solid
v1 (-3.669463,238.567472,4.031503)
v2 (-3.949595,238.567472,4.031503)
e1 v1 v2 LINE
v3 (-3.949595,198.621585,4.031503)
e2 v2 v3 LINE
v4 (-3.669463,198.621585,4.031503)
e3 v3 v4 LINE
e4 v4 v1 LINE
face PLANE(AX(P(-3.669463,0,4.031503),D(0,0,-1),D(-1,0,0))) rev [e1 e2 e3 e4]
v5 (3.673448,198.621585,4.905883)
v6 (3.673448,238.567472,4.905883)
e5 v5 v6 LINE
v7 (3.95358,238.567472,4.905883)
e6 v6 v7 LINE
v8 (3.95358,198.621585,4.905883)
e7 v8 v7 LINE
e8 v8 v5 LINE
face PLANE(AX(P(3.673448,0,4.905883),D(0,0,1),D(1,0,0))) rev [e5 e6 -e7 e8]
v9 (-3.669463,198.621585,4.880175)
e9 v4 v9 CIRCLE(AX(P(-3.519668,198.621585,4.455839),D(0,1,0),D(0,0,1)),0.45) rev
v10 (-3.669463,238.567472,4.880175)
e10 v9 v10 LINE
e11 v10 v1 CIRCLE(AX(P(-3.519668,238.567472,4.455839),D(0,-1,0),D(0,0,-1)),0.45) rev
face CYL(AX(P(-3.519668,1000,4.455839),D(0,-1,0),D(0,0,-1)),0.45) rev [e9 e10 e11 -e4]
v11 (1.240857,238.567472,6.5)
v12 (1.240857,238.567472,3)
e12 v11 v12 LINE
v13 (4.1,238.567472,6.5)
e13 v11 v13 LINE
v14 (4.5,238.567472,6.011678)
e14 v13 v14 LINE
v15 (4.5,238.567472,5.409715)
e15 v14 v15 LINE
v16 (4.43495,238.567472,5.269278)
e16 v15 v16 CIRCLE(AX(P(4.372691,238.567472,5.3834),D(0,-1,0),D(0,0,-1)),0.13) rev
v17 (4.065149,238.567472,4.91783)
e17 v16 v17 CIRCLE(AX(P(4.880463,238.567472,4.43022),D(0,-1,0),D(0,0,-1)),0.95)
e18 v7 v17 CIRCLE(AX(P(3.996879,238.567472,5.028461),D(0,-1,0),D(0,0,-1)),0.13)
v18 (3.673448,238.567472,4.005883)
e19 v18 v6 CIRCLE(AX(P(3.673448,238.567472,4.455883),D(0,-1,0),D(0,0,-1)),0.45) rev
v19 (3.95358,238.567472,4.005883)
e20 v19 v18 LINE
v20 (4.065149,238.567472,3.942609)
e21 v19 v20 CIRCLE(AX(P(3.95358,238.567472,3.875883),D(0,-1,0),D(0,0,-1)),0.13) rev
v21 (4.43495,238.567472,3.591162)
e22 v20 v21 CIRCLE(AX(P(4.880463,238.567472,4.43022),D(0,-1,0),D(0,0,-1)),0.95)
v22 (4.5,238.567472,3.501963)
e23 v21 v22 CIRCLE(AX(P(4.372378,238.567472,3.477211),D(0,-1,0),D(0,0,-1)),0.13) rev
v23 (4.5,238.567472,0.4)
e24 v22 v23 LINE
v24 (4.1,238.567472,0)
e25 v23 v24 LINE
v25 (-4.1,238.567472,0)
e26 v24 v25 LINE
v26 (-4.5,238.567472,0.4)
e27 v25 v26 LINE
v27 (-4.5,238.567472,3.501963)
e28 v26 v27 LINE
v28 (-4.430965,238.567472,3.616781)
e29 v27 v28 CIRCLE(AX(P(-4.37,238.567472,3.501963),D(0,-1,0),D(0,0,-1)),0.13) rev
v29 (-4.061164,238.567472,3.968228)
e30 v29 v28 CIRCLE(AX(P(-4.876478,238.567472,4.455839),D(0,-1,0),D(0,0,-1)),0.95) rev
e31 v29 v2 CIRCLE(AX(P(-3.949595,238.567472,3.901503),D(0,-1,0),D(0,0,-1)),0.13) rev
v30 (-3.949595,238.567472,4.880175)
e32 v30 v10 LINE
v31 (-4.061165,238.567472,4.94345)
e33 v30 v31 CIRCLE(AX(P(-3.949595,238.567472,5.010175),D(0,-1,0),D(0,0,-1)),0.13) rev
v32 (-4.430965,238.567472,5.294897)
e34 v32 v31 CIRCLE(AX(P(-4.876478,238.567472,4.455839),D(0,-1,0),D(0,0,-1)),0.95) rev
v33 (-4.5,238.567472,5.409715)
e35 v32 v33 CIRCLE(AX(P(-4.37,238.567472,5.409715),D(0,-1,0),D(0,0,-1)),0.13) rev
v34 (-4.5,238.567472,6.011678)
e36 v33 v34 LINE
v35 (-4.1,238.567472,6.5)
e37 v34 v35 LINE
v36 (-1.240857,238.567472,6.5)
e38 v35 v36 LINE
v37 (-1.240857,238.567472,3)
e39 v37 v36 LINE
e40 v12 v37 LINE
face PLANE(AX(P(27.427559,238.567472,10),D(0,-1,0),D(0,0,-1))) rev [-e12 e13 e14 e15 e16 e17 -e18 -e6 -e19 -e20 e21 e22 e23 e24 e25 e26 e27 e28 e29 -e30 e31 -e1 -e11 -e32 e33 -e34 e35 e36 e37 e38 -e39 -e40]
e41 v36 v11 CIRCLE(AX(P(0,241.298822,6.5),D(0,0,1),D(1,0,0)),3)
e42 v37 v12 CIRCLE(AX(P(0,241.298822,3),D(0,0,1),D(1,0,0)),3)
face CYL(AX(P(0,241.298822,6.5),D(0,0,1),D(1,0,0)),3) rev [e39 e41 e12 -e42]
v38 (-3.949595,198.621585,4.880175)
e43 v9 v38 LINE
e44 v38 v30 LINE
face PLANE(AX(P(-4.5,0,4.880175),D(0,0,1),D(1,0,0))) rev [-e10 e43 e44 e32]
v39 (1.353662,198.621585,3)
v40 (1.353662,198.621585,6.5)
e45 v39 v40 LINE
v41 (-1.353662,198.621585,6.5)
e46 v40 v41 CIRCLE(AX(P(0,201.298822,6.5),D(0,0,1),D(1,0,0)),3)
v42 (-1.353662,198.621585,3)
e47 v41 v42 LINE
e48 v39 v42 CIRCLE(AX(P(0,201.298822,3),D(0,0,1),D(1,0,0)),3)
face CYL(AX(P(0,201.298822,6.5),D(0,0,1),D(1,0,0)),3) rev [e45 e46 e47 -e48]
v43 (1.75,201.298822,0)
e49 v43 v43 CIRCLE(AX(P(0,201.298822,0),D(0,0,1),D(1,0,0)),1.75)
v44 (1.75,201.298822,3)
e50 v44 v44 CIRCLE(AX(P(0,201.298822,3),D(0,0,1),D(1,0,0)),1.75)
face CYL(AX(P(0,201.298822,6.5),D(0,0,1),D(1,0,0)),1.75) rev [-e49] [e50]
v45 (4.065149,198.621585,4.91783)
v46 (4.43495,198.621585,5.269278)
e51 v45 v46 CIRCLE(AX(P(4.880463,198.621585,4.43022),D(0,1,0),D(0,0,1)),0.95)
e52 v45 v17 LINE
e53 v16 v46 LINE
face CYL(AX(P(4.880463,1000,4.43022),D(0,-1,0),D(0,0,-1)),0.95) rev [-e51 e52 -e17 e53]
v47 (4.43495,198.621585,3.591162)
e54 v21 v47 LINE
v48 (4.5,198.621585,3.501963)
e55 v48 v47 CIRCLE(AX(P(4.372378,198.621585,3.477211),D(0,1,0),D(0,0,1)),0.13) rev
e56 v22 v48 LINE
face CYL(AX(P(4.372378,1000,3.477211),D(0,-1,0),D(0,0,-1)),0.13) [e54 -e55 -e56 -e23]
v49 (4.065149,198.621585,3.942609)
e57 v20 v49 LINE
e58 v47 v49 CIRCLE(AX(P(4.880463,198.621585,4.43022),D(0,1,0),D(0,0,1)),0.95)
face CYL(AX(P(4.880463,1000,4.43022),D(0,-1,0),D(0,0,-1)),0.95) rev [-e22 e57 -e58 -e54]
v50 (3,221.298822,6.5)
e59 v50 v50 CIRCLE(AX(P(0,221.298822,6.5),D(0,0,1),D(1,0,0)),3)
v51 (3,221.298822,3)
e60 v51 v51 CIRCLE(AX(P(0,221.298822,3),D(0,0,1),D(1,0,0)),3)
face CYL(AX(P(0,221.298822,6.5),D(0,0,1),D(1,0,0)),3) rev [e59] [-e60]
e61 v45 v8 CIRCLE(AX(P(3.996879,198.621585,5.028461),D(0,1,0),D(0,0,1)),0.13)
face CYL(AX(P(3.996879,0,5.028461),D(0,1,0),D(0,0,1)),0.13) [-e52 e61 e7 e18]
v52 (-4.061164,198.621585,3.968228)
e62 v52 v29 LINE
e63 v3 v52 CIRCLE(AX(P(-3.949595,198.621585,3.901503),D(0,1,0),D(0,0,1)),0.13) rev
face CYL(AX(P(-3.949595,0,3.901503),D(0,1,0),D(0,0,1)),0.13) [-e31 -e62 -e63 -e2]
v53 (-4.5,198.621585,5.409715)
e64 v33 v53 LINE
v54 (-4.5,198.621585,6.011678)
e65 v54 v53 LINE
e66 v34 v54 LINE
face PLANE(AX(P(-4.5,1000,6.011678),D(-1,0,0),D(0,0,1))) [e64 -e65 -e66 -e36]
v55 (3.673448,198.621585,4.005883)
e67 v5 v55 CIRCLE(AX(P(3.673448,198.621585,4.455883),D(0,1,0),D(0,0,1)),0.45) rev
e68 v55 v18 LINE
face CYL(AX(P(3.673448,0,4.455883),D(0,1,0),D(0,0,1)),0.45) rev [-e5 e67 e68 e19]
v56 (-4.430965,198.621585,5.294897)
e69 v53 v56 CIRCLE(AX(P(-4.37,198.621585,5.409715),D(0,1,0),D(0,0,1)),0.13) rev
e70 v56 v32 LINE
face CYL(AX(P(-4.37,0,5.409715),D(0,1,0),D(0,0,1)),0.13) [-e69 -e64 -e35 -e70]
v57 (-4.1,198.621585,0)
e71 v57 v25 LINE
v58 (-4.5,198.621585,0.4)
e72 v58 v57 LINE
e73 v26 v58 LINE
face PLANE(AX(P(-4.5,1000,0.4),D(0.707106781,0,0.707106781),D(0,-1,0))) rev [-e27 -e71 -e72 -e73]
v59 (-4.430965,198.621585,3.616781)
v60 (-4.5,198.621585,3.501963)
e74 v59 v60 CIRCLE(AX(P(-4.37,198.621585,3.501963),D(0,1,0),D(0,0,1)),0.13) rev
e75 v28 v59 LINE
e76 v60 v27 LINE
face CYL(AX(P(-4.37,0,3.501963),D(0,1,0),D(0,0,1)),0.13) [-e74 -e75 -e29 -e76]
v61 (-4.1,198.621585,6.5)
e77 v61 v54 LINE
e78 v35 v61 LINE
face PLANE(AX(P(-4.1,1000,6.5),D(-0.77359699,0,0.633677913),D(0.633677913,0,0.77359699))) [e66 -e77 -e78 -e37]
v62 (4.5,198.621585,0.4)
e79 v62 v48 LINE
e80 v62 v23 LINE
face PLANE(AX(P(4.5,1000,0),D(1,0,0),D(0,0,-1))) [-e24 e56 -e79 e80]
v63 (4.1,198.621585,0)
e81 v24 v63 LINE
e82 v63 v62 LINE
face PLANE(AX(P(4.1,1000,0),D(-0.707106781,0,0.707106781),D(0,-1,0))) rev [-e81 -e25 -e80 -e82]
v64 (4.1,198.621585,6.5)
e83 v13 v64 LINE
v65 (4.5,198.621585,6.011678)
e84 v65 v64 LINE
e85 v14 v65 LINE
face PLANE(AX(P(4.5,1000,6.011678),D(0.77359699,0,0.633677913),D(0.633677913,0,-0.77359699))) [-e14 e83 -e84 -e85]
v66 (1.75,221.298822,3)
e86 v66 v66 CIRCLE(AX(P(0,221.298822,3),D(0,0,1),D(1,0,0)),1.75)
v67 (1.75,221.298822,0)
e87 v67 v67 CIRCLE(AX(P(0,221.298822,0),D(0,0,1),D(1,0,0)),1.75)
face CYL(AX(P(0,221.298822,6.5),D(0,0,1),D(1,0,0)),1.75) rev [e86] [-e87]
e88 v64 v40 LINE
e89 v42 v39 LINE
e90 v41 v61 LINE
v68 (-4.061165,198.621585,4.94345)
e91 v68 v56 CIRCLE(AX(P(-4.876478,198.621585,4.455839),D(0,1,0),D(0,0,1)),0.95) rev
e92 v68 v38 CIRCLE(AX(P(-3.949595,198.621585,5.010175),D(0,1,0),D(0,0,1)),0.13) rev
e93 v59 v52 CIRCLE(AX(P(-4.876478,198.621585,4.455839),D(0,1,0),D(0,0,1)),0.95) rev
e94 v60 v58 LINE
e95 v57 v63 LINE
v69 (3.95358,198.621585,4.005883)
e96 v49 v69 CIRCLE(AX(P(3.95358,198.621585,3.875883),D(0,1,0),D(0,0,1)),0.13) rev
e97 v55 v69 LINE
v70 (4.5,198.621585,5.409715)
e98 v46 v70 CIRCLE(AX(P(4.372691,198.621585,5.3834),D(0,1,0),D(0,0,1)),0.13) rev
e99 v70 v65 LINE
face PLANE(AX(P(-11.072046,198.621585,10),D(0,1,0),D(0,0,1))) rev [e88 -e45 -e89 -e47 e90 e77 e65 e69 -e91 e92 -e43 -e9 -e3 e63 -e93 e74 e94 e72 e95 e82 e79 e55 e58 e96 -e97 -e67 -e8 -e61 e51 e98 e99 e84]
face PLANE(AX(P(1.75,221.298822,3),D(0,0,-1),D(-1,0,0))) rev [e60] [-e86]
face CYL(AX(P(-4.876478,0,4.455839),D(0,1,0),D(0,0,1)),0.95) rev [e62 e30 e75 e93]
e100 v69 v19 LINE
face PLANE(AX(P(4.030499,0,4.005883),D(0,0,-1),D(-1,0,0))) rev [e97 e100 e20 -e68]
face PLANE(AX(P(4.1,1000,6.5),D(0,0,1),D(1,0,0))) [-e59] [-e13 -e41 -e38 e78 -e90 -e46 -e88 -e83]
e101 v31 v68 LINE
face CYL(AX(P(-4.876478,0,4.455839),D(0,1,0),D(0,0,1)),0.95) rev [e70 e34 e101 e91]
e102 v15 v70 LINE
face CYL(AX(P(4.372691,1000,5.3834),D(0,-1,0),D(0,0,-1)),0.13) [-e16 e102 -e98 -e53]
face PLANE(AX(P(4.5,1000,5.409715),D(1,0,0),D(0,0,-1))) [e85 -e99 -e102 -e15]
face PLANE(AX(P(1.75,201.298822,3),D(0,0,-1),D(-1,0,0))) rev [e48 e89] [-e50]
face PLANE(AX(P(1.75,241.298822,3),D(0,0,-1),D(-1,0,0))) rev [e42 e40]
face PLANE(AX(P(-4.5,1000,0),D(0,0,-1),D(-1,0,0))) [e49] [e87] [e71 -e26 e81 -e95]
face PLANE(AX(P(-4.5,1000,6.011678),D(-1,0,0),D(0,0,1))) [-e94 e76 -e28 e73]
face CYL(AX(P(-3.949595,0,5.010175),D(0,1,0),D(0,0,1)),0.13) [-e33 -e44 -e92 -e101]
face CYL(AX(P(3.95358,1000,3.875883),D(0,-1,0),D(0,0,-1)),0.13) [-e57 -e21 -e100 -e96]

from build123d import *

# Parameters (mm, degrees)
RESSALTO_EXTRUS_O1_DEPTH                             = 1000
CORTE_EXTRUS_O1_START                                = -1000
CORTE_EXTRUS_O1_DEPTH                                = 1000
CORTE_EXTRUS_O2_DEPTH                                = 1001.031261626
CORTE_EXTRUS_O3_DEPTH                                = 1001.031261626
CORTE_EXTRUS_O4_DEPTH                                = 1001.031261626
CORTE_EXTRUS_O5_DEPTH                                = 0.002166667
CORTE_EXTRUS_O6_DEPTH                                = 0.002166667
CORTE_EXTRUS_O7_DEPTH                                = 0.002166667
CORTE_EXTRUS_O8_DEPTH                                = 0.002166667
INCLINA_O1_ANGLE                                     = 45.1469538
ESBO_O10_W                                           = 0.450000001
ESBO_O10_H                                           = 1000
REBAIXO_PARA_PARAFUSO_DE_M_QUINA_DE_CABE_D           = 3.5
REBAIXO_PARA_PARAFUSO_DE_M_QUINA_DE_CABE_CBORE_D     = 6
REBAIXO_PARA_PARAFUSO_DE_M_QUINA_DE_CABE_CBORE_DEPTH = 3.50000002
CHANFRO1_SIZE                                        = 0.062563219
CHANFRO1_SIZE2                                       = 0.062205617
CHANFRO3_START                                       = -3.730761794
CHANFRO3_DEPTH                                       = 0.399013115
CHANFRO4_SIZE                                        = 0.4
FILETE1_R                                            = 0.130000023
SKETCH1_W                                            = 36.072768502
SKETCH1_H                                            = 771.589023544
SKETCH1_W_2                                          = 21.632087489
SKETCH1_H_2                                          = 231.614654652
CUT_EXTRUDE1_DEPTH                                   = 10


with BuildPart() as part:
    # Esboço1 → Ressalto-extrusão1 (new body)
    with BuildSketch(Plane.XZ):
        with BuildLine():
            Line((4.5, 5.4097155), (4.5, 6.01167813))
            Line((4.5, 6.01167813), (4.1, 6.50000002))
            Line((4.1, 6.50000002), (-4.1, 6.50000002))
            Line((-4.1, 6.50000002), (-4.5, 6.01167813))
            Line((-4.5, 6.01167813), (-4.5, 2e-08))
            Line((-4.5, 2e-08), (4.5, 2e-08))
            Line((4.5, 2e-08), (4.5, 3.50196265))
            ThreePointArc((4.5, 3.50196265), (4.477413879, 3.553810372), (4.43494978, 3.59116167))
            ThreePointArc((4.43494978, 3.59116167), (3.930462682, 4.43021964), (4.43494978, 5.26927761))
            ThreePointArc((4.43494978, 5.26927761), (4.490651601, 5.328761203), (4.5, 5.4097155))
        make_face()
    extrude(amount=-RESSALTO_EXTRUS_O1_DEPTH)

    # Esboço2 → Corte-extrusão1 (cut)
    with BuildSketch(Plane(origin=(0, 1000, 0), x_dir=(-1, 0, 0), z_dir=(0, 1, 0)).offset(CORTE_EXTRUS_O1_START)):
        with BuildLine():
            Line((-4.030498711, 4.00588336), (-3.673447948, 4.00588336))
            ThreePointArc((-3.673447948, 4.00588336), (-3.223447946, 4.455883362), (-3.673447948, 4.905883363))
            Line((-3.673447948, 4.905883363), (-3.953580008, 4.905883363))
            ThreePointArc((-3.953580008, 4.905883363), (-4.010719931, 4.899199784), (-4.065149208, 4.917830263))
            ThreePointArc((-4.065149208, 4.917830263), (-3.93114763, 4.466290066), (-4.030498711, 4.00588336))
        make_face()
    extrude(amount=CORTE_EXTRUS_O1_DEPTH, mode=Mode.SUBTRACT)

    # Esboço3 → Corte-extrusão2 (cut, through all)
    with BuildSketch(Plane(origin=(0, 1000, 0), x_dir=(-1, 0, 0), z_dir=(0, 1, 0))):
        with BuildLine():
            Line((4.5, 4.03150278), (4.5, 4.88017535))
            Line((4.5, 4.88017535), (3.66946318, 4.88017535))
            ThreePointArc((3.66946318, 4.88017535), (3.969667593, 4.455839065), (3.66946318, 4.03150278))
            Line((3.66946318, 4.03150278), (4.5, 4.03150278))
        make_face()
    extrude(amount=-CORTE_EXTRUS_O2_DEPTH, mode=Mode.SUBTRACT)

    # Esboço4 → Corte-extrusão3 (cut, through all)
    with BuildSketch(Plane(origin=(0, 1000, 0), x_dir=(-1, 0, 0), z_dir=(0, 1, 0))):
        with BuildLine():
            Line((4.026513974, 4.88017535), (4.5, 4.88017535))
            Line((4.5, 4.88017535), (4.5, 5.328056964))
            ThreePointArc((4.5, 5.328056964), (4.223646078, 5.145991535), (4.026513974, 4.88017535))
        make_face()
    extrude(amount=-CORTE_EXTRUS_O3_DEPTH, mode=Mode.SUBTRACT)

    # Esboço5 → Corte-extrusão4 (cut, through all)
    with BuildSketch(Plane(origin=(0, 1000, 0), x_dir=(-1, 0, 0), z_dir=(0, 1, 0))):
        with BuildLine():
            Line((4.5, 3.583620931), (4.5, 4.03150278))
            Line((4.5, 4.03150278), (4.026513856, 4.03150278))
            ThreePointArc((4.026513856, 4.03150278), (4.223645982, 3.76568645), (4.5, 3.583620931))
        make_face()
    extrude(amount=-CORTE_EXTRUS_O4_DEPTH, mode=Mode.SUBTRACT)

    # Esboço6 → Corte-extrusão5 (cut)
    with BuildSketch(Plane(origin=(0, 1000, 0), x_dir=(-1, 0, 0), z_dir=(0, 1, 0))):
        Polygon((0.891369267, 3.403698133), (0.714701433, 3.168235633), (0.2187042, 2.61105), (1.0945792, 2.61105), (1.0945792, 2.695983333), (0.398689633, 2.695983333), (0.794326433, 3.149466667), (0.9743123, 3.3891), (1.067110588, 3.573407857), (0.95413722, 3.802321701), (0.7876908, 3.88505), (0.54301, 3.88505), (0.375434678, 3.803592619), (0.295011167, 3.6384023), (0.295011167, 3.562), (0.3812718, 3.562), (0.3812718, 3.631766667), (0.437672733, 3.743620833), (0.549645633, 3.800116667), (0.7802262, 3.800116667), (0.893028067, 3.743810633), (0.976240026, 3.576039029), align=None)
    extrude(amount=-CORTE_EXTRUS_O5_DEPTH, mode=Mode.SUBTRACT)

    # Esboço7 → Corte-extrusão6 (cut)
    with BuildSketch(Plane.XZ):
        Polygon((-0.214632167, 3.88505), (-0.953983333, 3.88505), (-0.953983333, 2.61105), (-0.214632167, 2.61105), (-0.214632167, 2.695983333), (-0.86905, 2.695983333), (-0.86905, 3.205583333), (-0.5123963, 3.205583333), (-0.5123963, 3.290516667), (-0.86905, 3.290516667), (-0.86905, 3.800116667), (-0.214632167, 3.800116667), align=None)
    extrude(amount=-CORTE_EXTRUS_O6_DEPTH, mode=Mode.SUBTRACT)

    # Esboço8 → Corte-extrusão7 (cut)
    with BuildSketch(Plane(origin=(0, 1000, 0), x_dir=(-1, 0, 0), z_dir=(0, 1, 0))):
        Polygon((-0.214632167, 3.88505), (-0.953983333, 3.88505), (-0.953983333, 2.61105), (-0.214632167, 2.61105), (-0.214632167, 2.695983333), (-0.86905, 2.695983333), (-0.86905, 3.205583333), (-0.5123963, 3.205583333), (-0.5123963, 3.290516667), (-0.86905, 3.290516667), (-0.86905, 3.800116667), (-0.214632167, 3.800116667), align=None)
    extrude(amount=-CORTE_EXTRUS_O7_DEPTH, mode=Mode.SUBTRACT)

    # Esboço9 → Corte-extrusão8 (cut)
    with BuildSketch(Plane.XZ):
        Polygon((0.510057167, 3.620830633), (0.6071, 3.718655633), (0.6071, 2.609403333), (0.692033333, 2.609403333), (0.692033333, 3.883403333), (0.6741176, 3.883403333), (0.6741176, 3.795069794), (0.3690544, 3.640736667), (0.3690544, 3.551253333), align=None)
    extrude(amount=-CORTE_EXTRUS_O8_DEPTH, mode=Mode.SUBTRACT)

    # Inclinação1
    inclina_o1_faces = [part.faces().sort_by_distance(p)[0] for p in [
        (0.6741176, 0.001083333, 3.839236564),
    ]]
    draft(inclina_o1_faces, Plane(origin=(0.692033333, 0.002166667, 3.883403333), x_dir=(-1, 0, 0), z_dir=(0, 0, -1)), INCLINA_O1_ANGLE)

    # Esboço10 → Corte-Revolução1 (revolve, cut)
    with BuildSketch(Plane.XY.offset(4.455839065)):
        with Locations((-3.294667591, 500)):
            Rectangle(ESBO_O10_W, ESBO_O10_H)
    revolve(axis=Axis((-3.519667591, 1000, 4.455839065), (0, -1, 0)), mode=Mode.SUBTRACT)

    # Rebaixo para parafuso de máquina de cabeça sextavada de M31 (through all)
    with Locations(Plane.XY.offset(6.50000002)):
        with Locations((0, 221.298822188), (0, 201.298822188), (0, 241.298822188), (0, 261.298822188)):
            CounterBoreHole(REBAIXO_PARA_PARAFUSO_DE_M_QUINA_DE_CABE_D / 2, REBAIXO_PARA_PARAFUSO_DE_M_QUINA_DE_CABE_CBORE_D / 2, REBAIXO_PARA_PARAFUSO_DE_M_QUINA_DE_CABE_CBORE_DEPTH)

    # Chanfro1
    chanfro1_edges = [part.edges().sort_by_distance(p)[0] for p in [
        (-0.976240026, 999.998916667, 3.576039029),
    ]]
    chanfro1_side = [part.faces().sort_by_distance(p)[0] for p in [
        (-0.933804646, 999.998916667, 3.489868581),
    ]]
    chamfer(chanfro1_edges, length=CHANFRO1_SIZE, length2=CHANFRO1_SIZE2, reference=chanfro1_side[0])

    # Chanfro3: read off the stored shape, not the designer's step
    # Chanfro3 outline → Chanfro3 (add)
    with BuildSketch(Plane(origin=(0, 0, 0), x_dir=(0.8991051825477068, 0, 0.43773264753254887), z_dir=(0.4377326475325489, 0, -0.8991051825477069)).offset(CHANFRO3_START)):
        Polygon((1.327401403, -999.997833333), (1.31122788, -999.997833333), (1.311999664, -1000), (1.327401403, -1000), align=None)
    extrude(amount=CHANFRO3_DEPTH)

    # Chanfro4
    chanfro4_edges = [part.edges().sort_by_distance(p)[0] for p in [
        (4.5, 500, 2e-08),
        (-4.5, 500, 2e-08),
    ]]
    chamfer(chanfro4_edges, length=CHANFRO4_SIZE)

    # Filete1
    filete1_edges = [part.edges().sort_by_distance(p)[0] for p in [
        (4.030498711, 500, 4.00588336),
        (-4.026513974, 500, 4.88017535),
        (-4.5, 500, 5.328056964),
        (-4.5, 500, 3.583620931),
        (-4.026513856, 500, 4.03150278),
    ]]
    fillet(filete1_edges, radius=FILETE1_R)

    # Sketch1 → Cut-Extrude1 (cut)
    with BuildSketch(Plane(origin=(0, 0, 0), x_dir=(-1, 0, 0), z_dir=(0, 0, -1))):
        with Locations((-9.39117436, 624.361983818)):
            Rectangle(SKETCH1_W, SKETCH1_H)
        with Locations((0.25600221, 82.81425767)):
            Rectangle(SKETCH1_W_2, SKETCH1_H_2)
    extrude(amount=-CUT_EXTRUDE1_DEPTH, mode=Mode.SUBTRACT)


solid = part.part
